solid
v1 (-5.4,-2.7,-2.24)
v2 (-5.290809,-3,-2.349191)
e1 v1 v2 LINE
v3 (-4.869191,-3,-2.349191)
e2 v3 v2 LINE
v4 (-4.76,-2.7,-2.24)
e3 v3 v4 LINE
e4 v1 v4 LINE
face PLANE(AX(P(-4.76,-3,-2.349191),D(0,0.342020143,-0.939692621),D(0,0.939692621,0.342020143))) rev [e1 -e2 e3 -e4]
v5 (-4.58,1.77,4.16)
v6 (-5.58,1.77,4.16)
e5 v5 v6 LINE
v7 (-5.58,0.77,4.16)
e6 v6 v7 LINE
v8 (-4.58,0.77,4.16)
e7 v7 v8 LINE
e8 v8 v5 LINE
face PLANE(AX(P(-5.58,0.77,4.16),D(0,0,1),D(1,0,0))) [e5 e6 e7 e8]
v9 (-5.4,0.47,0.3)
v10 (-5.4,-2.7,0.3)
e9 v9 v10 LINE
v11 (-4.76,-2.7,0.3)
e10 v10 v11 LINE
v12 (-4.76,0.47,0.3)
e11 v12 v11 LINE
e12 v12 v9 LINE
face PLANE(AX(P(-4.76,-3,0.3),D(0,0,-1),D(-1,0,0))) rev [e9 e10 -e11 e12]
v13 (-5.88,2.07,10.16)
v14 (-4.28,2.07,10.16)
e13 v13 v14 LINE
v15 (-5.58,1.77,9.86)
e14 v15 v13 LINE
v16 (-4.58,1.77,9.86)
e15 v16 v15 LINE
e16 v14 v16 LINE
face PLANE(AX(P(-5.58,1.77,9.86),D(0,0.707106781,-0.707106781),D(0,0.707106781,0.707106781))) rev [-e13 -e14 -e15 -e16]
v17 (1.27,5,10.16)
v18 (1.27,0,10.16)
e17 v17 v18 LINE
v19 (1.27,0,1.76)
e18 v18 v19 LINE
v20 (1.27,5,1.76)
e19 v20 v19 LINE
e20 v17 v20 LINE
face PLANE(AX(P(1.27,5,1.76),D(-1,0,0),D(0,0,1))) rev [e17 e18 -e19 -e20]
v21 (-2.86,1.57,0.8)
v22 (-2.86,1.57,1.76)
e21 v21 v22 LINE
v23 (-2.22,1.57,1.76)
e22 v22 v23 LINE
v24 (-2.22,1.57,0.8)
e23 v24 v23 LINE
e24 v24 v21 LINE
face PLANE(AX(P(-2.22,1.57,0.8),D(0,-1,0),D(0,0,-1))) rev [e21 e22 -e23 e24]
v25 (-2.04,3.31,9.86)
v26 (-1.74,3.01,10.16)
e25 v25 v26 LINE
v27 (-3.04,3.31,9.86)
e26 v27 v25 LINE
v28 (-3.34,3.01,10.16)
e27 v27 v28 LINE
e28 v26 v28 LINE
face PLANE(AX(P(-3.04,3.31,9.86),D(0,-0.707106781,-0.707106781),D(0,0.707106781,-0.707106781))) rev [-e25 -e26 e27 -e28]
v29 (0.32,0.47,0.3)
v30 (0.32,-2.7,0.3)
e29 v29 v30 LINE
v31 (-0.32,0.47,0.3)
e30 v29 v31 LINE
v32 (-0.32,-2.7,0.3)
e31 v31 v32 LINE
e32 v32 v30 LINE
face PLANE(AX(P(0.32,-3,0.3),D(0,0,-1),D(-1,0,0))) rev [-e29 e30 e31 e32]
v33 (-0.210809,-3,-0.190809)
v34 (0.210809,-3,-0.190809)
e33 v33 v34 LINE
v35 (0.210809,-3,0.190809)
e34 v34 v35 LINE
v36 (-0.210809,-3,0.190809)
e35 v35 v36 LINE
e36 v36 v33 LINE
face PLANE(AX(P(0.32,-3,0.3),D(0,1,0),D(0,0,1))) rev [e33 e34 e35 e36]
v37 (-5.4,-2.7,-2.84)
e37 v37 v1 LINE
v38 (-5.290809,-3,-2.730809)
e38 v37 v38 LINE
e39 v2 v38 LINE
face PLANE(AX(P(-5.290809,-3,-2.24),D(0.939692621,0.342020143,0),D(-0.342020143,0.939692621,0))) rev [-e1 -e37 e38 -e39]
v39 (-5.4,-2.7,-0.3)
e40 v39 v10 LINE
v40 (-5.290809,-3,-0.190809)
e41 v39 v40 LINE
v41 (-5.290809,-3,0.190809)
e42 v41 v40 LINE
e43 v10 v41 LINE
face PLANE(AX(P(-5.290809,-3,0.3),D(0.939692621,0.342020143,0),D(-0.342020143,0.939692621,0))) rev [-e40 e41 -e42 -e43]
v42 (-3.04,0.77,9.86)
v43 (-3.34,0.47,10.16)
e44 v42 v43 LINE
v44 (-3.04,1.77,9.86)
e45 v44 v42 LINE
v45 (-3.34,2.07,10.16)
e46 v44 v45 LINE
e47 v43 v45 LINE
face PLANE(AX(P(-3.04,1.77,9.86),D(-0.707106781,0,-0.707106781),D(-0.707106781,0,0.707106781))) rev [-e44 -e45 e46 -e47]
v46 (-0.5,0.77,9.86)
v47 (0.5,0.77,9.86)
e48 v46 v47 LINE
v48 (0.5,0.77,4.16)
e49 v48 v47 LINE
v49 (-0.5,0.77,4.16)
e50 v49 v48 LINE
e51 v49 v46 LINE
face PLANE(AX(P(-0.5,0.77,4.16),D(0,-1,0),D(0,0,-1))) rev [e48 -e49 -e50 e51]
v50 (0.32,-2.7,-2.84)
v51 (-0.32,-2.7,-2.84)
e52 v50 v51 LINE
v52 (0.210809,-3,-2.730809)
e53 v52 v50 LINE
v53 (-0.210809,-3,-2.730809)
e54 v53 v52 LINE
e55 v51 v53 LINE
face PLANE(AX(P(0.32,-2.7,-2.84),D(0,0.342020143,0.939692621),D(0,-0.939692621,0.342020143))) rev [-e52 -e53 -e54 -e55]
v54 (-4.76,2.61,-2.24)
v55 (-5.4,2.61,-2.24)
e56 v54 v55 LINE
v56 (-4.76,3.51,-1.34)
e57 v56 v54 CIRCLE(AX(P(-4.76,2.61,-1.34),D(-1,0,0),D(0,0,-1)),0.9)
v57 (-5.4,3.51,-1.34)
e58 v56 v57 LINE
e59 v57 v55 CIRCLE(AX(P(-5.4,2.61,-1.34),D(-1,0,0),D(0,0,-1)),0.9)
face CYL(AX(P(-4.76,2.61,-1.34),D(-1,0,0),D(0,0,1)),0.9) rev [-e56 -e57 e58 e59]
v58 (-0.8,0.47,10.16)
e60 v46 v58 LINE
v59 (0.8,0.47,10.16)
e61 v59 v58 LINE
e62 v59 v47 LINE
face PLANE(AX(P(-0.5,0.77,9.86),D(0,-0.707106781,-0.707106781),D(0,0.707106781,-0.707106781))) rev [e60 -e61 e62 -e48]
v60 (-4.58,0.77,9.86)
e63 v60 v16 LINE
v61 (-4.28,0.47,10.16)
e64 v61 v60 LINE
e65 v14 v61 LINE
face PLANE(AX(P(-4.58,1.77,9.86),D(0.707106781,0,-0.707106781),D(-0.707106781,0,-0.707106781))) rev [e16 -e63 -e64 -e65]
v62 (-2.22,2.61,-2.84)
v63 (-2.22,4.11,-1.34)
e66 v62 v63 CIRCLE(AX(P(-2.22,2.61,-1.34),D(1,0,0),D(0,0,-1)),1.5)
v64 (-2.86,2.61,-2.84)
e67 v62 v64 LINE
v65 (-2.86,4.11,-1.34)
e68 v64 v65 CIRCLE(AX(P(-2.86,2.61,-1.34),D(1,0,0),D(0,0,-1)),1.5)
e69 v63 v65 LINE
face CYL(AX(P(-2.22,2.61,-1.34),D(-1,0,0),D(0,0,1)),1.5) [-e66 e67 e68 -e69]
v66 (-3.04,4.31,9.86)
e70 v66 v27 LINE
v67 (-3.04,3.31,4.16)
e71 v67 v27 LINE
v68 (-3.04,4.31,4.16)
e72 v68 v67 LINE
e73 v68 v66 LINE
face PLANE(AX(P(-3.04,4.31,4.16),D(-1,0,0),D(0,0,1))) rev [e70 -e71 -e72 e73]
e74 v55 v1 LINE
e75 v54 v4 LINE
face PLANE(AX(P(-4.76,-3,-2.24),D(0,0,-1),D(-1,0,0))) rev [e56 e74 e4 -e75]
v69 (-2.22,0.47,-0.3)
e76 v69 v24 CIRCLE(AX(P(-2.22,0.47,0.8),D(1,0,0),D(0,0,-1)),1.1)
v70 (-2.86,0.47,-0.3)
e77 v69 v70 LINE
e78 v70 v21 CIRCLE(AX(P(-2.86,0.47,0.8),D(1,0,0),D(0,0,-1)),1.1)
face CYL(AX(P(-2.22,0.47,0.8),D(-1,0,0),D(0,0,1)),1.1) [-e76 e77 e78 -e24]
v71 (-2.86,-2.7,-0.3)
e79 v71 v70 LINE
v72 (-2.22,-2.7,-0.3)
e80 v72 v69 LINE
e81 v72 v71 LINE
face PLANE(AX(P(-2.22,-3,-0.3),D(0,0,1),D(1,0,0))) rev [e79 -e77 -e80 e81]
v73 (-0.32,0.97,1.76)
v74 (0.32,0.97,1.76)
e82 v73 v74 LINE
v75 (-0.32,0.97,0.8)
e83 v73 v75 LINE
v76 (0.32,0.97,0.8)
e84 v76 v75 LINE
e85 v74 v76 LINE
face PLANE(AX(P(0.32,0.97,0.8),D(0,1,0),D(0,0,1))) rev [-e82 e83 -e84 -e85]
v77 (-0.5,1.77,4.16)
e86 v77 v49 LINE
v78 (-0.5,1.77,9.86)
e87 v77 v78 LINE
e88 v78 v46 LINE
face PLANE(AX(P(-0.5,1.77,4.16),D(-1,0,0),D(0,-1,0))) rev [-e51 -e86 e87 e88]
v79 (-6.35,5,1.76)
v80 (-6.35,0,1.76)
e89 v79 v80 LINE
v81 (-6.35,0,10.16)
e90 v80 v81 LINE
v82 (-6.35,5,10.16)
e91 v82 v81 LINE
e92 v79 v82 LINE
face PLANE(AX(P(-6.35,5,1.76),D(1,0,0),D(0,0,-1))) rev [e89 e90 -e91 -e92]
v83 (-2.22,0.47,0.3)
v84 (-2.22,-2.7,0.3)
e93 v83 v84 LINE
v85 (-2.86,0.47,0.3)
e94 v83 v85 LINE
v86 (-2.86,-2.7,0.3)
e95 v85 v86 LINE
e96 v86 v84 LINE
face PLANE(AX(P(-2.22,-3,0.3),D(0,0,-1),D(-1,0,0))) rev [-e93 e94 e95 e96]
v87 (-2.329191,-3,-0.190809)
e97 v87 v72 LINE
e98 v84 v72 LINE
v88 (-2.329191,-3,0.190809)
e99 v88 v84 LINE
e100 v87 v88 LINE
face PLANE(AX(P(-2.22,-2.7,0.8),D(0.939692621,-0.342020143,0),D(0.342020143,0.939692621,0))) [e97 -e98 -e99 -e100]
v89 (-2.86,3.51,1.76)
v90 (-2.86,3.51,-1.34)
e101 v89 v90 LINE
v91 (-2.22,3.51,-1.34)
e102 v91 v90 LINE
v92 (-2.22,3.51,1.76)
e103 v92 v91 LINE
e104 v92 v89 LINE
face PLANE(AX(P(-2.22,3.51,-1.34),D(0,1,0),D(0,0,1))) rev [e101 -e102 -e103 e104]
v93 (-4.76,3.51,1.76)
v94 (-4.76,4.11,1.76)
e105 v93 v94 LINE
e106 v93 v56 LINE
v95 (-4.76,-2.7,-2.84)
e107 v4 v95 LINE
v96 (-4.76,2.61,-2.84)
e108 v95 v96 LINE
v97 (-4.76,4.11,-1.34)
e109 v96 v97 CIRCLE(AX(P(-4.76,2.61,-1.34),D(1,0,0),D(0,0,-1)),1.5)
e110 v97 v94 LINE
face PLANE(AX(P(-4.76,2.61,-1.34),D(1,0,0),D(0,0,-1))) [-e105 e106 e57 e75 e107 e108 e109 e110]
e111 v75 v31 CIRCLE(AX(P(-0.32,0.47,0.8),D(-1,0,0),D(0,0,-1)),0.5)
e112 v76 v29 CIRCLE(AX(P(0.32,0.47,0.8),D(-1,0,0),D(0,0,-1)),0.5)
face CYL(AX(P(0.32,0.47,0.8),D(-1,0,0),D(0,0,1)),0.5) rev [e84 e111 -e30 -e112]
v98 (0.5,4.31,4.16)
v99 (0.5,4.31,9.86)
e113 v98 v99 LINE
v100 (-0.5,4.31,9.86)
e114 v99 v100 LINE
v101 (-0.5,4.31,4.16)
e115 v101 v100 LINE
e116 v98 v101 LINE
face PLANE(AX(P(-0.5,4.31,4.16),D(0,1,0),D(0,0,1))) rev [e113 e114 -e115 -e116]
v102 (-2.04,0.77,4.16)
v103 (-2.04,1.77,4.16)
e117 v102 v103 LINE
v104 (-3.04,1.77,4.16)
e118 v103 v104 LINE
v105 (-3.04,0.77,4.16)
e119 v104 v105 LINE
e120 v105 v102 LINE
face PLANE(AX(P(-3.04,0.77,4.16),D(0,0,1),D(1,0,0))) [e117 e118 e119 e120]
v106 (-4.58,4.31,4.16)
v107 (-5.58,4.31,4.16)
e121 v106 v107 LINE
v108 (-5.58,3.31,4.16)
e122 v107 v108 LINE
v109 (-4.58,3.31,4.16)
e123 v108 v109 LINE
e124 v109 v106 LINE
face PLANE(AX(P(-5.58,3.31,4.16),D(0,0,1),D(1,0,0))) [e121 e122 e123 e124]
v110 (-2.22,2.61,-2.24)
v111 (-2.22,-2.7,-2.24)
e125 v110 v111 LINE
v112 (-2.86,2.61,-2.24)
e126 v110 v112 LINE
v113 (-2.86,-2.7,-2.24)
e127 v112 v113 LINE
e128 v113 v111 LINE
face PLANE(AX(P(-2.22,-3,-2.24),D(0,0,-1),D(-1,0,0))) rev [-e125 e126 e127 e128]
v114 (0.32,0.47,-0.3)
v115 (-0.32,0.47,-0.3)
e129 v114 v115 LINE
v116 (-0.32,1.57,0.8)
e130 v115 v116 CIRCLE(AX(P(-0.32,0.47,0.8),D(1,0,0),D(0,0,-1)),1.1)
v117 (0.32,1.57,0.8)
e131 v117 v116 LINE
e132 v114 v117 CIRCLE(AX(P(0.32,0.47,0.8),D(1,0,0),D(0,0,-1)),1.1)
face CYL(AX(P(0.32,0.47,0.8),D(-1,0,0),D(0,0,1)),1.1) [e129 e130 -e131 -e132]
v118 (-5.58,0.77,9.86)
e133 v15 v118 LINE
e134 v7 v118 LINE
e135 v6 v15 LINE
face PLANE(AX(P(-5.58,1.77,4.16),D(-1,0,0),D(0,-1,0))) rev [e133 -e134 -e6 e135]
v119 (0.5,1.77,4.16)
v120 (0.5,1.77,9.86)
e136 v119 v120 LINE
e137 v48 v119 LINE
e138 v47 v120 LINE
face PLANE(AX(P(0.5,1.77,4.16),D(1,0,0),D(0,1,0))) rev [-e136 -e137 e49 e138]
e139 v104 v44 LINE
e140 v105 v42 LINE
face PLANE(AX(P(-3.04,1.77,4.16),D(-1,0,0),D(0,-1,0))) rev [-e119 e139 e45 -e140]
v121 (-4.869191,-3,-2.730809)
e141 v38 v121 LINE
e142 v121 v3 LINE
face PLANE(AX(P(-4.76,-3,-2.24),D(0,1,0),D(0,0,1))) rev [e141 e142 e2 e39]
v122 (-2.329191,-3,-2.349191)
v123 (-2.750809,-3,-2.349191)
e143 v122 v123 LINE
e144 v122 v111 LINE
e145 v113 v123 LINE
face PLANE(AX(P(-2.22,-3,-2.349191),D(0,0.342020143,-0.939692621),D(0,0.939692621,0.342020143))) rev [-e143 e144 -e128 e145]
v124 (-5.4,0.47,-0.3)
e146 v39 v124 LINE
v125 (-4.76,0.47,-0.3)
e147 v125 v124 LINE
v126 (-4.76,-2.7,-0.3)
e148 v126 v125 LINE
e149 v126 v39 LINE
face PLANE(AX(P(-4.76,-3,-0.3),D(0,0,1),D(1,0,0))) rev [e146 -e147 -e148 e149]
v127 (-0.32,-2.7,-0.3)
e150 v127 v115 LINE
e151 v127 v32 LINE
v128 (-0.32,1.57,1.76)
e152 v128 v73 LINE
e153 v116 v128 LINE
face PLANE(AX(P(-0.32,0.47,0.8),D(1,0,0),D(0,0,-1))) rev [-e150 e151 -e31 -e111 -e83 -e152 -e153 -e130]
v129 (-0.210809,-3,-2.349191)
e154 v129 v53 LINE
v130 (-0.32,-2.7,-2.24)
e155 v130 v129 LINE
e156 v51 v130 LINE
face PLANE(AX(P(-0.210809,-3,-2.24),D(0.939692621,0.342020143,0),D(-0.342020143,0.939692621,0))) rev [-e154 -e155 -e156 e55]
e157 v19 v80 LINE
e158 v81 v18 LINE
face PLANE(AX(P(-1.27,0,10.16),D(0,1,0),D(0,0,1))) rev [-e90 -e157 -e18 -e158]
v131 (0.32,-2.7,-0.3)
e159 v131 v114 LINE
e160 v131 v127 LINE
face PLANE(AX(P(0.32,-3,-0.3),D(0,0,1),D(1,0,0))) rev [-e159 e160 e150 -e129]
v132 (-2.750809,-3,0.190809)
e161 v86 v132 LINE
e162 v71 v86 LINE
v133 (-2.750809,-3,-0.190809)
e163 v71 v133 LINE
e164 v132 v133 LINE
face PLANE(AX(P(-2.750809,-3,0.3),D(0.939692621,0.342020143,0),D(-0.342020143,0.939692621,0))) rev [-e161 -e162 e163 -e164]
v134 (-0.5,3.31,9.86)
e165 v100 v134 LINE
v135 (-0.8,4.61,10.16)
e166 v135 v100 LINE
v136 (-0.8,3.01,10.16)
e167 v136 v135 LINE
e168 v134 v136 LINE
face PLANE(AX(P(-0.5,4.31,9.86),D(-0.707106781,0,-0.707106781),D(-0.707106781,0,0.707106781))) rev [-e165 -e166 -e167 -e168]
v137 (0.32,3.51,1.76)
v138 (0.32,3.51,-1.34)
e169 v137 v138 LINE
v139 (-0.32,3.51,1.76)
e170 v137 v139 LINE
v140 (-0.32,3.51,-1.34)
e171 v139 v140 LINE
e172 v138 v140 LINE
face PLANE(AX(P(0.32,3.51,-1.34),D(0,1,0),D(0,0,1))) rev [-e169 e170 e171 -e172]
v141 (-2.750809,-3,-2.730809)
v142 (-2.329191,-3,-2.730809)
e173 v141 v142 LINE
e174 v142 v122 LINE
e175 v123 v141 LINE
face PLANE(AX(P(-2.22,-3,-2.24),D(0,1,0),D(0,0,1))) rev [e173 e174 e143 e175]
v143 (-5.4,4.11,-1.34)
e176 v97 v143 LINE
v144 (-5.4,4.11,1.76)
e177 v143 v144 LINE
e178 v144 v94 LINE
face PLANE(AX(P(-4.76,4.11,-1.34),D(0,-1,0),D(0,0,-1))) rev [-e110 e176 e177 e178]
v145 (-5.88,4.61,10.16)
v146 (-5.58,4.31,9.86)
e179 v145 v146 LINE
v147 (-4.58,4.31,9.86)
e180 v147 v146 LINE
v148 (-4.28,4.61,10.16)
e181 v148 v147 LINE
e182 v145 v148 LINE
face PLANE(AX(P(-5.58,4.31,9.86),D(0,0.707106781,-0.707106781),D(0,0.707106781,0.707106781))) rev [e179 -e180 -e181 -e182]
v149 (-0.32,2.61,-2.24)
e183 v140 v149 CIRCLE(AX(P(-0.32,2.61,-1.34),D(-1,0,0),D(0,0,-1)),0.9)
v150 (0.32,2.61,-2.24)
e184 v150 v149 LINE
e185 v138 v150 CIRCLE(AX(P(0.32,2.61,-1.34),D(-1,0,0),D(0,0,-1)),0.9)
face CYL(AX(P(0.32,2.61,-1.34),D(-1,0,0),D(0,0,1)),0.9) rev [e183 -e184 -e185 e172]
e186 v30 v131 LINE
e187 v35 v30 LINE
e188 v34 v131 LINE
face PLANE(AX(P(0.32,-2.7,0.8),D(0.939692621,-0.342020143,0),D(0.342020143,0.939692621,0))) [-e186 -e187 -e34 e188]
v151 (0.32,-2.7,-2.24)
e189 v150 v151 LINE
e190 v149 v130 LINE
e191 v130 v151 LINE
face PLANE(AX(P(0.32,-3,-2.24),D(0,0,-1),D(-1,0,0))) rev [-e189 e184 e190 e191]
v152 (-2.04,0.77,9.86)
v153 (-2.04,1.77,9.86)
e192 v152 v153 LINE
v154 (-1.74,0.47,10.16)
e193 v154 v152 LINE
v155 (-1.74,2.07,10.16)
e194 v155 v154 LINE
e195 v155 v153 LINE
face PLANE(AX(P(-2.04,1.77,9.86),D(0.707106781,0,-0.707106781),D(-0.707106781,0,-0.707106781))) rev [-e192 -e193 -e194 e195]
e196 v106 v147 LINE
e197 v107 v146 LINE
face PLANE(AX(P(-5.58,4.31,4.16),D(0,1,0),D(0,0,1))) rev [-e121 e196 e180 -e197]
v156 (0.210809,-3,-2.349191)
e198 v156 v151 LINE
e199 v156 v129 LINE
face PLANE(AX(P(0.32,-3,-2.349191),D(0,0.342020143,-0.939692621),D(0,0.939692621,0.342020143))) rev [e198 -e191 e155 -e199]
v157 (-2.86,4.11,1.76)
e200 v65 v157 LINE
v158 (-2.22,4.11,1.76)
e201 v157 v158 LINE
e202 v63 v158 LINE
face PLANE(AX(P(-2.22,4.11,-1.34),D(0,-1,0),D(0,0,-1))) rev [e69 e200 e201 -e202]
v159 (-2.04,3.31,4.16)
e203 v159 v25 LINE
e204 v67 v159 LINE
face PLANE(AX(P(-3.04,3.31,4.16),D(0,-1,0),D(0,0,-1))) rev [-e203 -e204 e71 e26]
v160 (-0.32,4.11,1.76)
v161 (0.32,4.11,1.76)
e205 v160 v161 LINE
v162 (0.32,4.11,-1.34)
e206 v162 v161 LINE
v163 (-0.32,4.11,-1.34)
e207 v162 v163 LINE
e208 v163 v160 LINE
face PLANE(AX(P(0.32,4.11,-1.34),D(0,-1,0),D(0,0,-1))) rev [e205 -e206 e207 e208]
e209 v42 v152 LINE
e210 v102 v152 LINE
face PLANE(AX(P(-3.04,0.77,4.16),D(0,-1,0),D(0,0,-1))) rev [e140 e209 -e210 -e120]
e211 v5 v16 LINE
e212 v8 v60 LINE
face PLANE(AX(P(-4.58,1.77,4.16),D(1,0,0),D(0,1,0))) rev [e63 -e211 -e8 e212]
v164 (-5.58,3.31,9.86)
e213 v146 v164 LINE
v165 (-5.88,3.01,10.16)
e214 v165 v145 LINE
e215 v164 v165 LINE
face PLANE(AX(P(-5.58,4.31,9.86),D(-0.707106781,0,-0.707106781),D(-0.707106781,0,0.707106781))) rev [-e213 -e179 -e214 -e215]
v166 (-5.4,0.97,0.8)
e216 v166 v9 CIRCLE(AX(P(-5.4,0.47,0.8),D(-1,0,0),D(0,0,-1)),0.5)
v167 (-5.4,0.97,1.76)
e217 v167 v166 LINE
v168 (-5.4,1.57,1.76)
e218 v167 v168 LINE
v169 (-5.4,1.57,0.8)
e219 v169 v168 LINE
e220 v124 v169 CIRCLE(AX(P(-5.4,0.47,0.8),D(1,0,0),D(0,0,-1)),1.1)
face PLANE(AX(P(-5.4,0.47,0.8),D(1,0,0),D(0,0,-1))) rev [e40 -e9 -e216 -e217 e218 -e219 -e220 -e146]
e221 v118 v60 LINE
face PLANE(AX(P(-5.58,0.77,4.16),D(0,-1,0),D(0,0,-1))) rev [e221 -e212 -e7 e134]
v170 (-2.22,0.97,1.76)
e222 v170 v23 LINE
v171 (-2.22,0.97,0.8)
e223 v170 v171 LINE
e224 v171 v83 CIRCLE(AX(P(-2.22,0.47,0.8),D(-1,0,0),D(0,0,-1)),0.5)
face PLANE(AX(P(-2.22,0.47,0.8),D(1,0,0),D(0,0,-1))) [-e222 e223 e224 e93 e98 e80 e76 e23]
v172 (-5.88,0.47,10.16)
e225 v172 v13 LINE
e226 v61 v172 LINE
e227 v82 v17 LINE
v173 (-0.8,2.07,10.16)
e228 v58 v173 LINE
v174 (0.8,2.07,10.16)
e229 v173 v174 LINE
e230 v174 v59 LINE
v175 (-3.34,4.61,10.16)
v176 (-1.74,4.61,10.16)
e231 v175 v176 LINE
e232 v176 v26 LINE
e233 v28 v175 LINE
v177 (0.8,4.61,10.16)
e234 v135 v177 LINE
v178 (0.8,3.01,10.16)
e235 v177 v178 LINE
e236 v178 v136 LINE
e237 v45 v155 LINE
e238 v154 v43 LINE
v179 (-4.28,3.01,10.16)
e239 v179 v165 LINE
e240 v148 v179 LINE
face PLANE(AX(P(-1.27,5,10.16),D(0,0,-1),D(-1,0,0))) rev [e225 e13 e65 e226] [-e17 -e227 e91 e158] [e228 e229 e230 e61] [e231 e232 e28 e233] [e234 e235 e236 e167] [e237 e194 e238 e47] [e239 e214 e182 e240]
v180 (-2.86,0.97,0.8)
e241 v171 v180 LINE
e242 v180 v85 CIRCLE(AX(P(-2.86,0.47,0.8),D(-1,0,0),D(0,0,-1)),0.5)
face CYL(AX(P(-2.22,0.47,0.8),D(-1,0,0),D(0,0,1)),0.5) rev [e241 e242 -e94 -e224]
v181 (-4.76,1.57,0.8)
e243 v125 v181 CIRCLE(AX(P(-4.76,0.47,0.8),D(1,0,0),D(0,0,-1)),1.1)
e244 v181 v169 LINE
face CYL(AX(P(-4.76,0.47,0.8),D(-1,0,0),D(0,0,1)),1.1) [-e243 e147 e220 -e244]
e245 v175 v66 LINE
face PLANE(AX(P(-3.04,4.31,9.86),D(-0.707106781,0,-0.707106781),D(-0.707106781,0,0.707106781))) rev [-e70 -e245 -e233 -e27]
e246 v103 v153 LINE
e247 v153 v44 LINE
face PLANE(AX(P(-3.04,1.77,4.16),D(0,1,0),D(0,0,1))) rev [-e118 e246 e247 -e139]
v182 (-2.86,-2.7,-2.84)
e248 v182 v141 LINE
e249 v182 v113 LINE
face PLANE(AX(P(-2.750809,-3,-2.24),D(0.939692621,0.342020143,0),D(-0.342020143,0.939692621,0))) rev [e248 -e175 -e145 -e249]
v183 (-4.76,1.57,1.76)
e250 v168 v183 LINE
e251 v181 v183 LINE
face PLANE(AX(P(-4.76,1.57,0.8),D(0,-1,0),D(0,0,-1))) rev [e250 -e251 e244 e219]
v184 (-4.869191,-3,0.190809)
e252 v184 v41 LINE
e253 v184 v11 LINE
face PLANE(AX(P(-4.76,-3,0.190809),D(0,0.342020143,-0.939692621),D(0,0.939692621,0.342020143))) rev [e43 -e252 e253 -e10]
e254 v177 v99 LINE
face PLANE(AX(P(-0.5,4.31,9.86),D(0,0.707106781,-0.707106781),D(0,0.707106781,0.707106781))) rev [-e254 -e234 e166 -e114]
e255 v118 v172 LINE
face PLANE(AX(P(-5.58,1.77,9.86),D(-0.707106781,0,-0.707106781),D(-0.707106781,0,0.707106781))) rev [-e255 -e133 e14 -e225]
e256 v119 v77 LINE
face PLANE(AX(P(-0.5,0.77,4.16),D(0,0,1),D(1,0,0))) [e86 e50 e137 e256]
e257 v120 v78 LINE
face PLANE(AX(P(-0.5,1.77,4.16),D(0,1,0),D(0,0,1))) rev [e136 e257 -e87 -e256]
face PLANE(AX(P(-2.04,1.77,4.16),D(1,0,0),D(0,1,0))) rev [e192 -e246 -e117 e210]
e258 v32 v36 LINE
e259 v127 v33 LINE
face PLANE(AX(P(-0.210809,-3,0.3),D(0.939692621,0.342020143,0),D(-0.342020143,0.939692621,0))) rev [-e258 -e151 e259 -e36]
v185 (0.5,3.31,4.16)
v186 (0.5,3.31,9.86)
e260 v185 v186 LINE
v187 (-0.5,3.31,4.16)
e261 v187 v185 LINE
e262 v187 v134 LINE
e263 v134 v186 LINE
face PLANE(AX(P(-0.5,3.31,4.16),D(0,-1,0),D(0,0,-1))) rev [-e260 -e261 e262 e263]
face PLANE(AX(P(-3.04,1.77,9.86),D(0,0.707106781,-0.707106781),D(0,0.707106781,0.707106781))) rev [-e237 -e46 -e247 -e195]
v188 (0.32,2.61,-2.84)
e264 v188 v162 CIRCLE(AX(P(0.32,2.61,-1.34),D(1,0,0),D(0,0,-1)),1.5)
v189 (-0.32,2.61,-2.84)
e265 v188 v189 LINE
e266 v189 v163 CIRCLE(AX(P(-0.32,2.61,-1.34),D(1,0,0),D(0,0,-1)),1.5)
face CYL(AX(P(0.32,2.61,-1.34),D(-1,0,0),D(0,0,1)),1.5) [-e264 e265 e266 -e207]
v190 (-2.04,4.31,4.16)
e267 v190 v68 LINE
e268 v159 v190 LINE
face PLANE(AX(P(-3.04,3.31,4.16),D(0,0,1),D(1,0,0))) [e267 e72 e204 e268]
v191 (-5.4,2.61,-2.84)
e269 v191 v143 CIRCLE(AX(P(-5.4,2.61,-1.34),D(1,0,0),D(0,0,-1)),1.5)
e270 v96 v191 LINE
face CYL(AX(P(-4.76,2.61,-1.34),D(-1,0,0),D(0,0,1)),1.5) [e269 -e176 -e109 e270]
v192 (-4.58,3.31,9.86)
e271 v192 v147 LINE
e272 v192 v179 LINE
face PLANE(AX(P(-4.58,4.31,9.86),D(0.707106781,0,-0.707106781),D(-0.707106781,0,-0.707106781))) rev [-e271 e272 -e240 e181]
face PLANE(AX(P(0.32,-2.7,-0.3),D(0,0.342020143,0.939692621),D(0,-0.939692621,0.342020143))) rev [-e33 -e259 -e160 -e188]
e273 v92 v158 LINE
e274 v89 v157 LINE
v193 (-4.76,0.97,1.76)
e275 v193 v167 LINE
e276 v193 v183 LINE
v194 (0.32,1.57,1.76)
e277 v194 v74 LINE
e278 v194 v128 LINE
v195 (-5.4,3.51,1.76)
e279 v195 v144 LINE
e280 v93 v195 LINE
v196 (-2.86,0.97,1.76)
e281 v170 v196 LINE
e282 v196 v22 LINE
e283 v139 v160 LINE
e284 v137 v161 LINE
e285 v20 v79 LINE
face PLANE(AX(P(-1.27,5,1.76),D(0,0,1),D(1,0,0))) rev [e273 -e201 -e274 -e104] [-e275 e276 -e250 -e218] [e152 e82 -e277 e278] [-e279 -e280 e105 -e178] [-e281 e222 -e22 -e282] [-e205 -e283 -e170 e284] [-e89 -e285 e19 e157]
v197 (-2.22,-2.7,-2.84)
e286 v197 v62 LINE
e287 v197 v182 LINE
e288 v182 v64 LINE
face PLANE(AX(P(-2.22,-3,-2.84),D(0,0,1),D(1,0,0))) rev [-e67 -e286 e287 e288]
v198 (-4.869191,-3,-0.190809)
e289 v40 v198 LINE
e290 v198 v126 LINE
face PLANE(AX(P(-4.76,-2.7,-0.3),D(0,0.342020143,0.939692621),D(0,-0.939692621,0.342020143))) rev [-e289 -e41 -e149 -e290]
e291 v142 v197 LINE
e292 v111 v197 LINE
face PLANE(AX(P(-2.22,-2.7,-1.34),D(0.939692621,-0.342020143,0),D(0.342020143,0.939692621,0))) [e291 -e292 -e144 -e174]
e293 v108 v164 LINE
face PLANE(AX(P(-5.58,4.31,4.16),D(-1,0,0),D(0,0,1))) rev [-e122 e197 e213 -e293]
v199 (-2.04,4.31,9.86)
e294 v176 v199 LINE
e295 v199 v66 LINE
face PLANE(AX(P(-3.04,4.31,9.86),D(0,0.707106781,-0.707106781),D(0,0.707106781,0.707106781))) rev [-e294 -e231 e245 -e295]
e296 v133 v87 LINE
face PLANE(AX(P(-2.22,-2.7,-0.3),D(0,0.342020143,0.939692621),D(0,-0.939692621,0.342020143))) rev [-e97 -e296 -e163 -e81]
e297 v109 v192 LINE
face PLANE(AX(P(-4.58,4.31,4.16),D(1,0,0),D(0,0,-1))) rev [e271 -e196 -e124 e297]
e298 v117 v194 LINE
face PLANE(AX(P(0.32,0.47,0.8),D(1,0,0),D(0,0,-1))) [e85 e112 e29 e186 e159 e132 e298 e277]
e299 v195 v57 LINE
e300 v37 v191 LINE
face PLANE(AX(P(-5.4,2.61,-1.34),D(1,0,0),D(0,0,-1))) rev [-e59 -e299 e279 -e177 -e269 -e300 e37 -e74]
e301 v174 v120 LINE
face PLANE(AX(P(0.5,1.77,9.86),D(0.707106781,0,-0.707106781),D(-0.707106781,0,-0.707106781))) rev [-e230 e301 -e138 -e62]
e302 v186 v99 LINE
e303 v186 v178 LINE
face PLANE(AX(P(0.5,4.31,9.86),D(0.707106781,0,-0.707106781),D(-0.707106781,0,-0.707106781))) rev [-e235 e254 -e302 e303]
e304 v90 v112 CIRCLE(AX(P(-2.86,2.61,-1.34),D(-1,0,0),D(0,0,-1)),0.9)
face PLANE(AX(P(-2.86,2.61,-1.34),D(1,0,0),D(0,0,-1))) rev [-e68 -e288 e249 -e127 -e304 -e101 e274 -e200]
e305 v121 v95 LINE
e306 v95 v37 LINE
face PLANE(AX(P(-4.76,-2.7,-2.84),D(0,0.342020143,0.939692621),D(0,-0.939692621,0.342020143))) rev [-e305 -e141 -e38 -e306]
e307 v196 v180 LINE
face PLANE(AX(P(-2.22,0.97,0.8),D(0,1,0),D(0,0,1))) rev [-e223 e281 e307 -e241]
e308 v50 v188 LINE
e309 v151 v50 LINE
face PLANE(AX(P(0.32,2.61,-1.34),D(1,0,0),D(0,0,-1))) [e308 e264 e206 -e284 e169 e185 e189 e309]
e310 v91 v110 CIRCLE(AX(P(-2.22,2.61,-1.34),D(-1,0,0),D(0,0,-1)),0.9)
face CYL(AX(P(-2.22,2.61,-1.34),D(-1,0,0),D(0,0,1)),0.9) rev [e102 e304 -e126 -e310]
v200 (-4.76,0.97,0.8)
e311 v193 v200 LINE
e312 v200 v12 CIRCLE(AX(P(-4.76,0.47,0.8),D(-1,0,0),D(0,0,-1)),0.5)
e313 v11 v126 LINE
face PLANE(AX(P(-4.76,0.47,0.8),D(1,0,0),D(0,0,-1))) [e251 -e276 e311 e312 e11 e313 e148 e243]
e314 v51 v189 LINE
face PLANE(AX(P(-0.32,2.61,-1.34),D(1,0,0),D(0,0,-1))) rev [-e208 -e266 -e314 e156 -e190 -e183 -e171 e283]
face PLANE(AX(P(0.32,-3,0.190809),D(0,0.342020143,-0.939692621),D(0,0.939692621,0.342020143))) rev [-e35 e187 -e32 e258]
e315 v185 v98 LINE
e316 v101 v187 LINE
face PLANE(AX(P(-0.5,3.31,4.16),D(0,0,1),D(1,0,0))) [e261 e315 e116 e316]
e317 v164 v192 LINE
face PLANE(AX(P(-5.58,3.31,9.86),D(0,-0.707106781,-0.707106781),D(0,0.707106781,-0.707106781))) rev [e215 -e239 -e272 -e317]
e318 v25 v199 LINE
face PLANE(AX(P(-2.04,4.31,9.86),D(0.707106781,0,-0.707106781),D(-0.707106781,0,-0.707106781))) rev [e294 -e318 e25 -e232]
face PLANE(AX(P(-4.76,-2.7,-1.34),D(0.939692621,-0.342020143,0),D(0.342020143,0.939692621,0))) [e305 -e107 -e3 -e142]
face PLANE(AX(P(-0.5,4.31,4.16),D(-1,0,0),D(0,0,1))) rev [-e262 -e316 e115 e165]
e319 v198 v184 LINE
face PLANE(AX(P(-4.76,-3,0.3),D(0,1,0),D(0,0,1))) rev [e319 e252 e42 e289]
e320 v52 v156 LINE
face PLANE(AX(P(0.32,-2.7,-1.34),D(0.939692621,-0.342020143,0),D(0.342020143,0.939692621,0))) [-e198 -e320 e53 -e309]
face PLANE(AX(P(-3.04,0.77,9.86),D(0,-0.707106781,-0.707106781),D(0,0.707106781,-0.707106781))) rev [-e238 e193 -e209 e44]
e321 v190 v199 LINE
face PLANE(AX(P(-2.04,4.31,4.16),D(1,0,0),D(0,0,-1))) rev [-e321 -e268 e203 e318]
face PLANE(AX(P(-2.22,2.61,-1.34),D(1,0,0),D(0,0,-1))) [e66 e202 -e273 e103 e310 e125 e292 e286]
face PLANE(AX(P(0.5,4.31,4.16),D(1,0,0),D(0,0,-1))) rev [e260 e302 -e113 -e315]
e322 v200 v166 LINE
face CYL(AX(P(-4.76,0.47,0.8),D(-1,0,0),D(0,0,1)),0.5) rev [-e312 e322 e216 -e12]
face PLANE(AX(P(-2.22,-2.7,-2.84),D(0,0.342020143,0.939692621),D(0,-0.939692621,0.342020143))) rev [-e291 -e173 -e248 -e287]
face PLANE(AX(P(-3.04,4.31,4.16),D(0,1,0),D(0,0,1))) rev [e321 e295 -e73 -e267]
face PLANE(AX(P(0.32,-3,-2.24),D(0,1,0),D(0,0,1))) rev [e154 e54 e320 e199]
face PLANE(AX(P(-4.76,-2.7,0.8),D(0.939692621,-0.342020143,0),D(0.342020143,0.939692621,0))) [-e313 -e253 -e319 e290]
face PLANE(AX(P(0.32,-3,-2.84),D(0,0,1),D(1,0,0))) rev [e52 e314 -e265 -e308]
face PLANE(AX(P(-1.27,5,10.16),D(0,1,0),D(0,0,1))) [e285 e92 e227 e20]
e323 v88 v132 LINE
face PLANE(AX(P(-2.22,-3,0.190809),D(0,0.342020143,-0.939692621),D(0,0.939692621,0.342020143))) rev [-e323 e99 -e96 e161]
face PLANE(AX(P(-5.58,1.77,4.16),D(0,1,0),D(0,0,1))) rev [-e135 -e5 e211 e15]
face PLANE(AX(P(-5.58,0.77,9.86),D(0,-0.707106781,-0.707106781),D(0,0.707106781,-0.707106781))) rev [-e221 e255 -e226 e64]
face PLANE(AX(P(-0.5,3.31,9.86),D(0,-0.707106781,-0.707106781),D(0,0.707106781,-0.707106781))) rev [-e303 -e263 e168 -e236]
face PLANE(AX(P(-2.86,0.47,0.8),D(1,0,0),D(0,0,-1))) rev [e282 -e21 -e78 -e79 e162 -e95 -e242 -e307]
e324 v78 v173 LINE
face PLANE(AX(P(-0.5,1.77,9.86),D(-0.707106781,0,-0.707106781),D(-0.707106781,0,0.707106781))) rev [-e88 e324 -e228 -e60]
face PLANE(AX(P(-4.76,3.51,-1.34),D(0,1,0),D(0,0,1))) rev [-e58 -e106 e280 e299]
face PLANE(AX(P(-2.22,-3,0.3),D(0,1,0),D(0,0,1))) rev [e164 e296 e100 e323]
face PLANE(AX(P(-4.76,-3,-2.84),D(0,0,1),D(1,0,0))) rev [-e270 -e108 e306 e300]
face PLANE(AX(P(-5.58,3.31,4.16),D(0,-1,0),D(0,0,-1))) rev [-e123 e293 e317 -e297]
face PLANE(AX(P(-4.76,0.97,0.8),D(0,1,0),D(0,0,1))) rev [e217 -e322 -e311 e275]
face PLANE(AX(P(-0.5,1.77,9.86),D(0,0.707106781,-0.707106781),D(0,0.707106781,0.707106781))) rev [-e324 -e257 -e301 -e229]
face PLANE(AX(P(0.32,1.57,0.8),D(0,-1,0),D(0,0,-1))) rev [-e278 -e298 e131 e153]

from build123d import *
from OCP.BRepFilletAPI import BRepFilletAPI_MakeChamfer
from build123d.topology import SkipClean

# Parameters (mm, degrees)
EXTRUDE_2563_DEPTH                    = 0.32
EXTRUDE_2563_2_DEPTH                  = 0.32
SKETCH_2_W                            = 2.54
SKETCH_2_H                            = 8.4
EXTRUDE_2921_DEPTH                    = 5
SKETCH_3_W                            = 1
SKETCH_3_H                            = 1
CUT_EXTRUDE_3170_DEPTH                = 6
CHAMFER_1_SIZE                        = 0.3
CHAMFER_2_SIZE                        = 0.3
CHAMFER_2_SIZE2                       = 0.10919107
PATTERN_LINEAR_3747_COUNT             = 3
PATTERN_LINEAR_3747_PITCH             = 2.54
CHAMFER_1_OF_PATTERN_LINEAR_3747_SIZE = 0.3
PATTERN_START                         = -5.29080893
PATTERN_LINEAR_12180_DEPTH            = 0.42161786
PATTERN_START_2                       = -2.75080893
PATTERN_LINEAR_12180_2_DEPTH          = 0.42161786
PATTERN_START_3                       = -0.19080893
PATTERN_LINEAR_12180_3_OUTLINE_W      = 0.10919107
PATTERN_LINEAR_12180_3_OUTLINE_H      = 0.6
PATTERN_LINEAR_12180_3_DEPTH          = 0.99080893
PATTERN_START_4                       = -2.84
PATTERN_LINEAR_12180_4_DEPTH          = 0.6
PATTERN_START_5                       = -2.73080893
PATTERN_LINEAR_12180_5_OUTLINE_W      = 0.10919107
PATTERN_LINEAR_12180_5_OUTLINE_H      = 2.54
PATTERN_LINEAR_12180_5_DEPTH          = 1.39080893
PATTERN_START_6                       = -1.484615596
PATTERN_LINEAR_12180_6_OUTLINE_W      = 0.10919107
PATTERN_LINEAR_12180_6_OUTLINE_H      = 0.6
PATTERN_LINEAR_12180_6_DEPTH          = 4.484615596
PATTERN_START_7                       = 0.719658002
PATTERN_LINEAR_12180_7_OUTLINE_W      = 0.10919107
PATTERN_LINEAR_12180_7_OUTLINE_H      = 0.6
PATTERN_LINEAR_12180_7_DEPTH          = 2.280341998
PATTERN_START_8                       = -0.3
PATTERN_LINEAR_12180_8_DEPTH          = 0.49080893
PATTERN_START_9                       = -5.4
PATTERN_LINEAR_12180_9_DEPTH          = 3.18


with BuildPart() as part:
    # Эскиз1 → Extrude 2563 (new, symmetric)
    with BuildSketch(Plane(origin=(0, 0, 0), x_dir=(0, 0, -1), z_dir=(1, 0, 0))):
        with BuildLine():
            Line((0.3, -3), (0.3, 0.47))
            ThreePointArc((0.3, 0.47), (-0.022182541, 1.247817459), (-0.8, 1.57))
            Line((-0.8, 1.57), (-4.16, 1.57))
            Line((-4.16, 1.57), (-4.16, 0.97))
            Line((-4.16, 0.97), (-0.8, 0.97))
            ThreePointArc((-0.8, 0.97), (-0.446446609, 0.823553391), (-0.3, 0.47))
            Line((-0.3, 0.47), (-0.3, -3))
            Line((-0.3, -3), (0.3, -3))
        make_face()
    extrude(amount=EXTRUDE_2563_DEPTH, both=True)



with BuildPart() as body_2:
    # Эскиз1 → Extrude 2563 2 (new, symmetric)
    with BuildSketch(Plane(origin=(0, 0, 0), x_dir=(0, 0, -1), z_dir=(1, 0, 0))):
        with BuildLine():
            Line((2.84, -3), (2.84, 2.61))
            ThreePointArc((2.84, 2.61), (2.400660172, 3.670660172), (1.34, 4.11))
            Line((1.34, 4.11), (-4.16, 4.11))
            Line((-4.16, 4.11), (-4.16, 3.51))
            Line((-4.16, 3.51), (1.34, 3.51))
            ThreePointArc((1.34, 3.51), (1.976396103, 3.246396103), (2.24, 2.61))
            Line((2.24, 2.61), (2.24, -3))
            Line((2.24, -3), (2.84, -3))
        make_face()
    extrude(amount=EXTRUDE_2563_2_DEPTH, both=True)


with BuildPart() as part_1:
    add(part.part)

    add(body_2.part)  # Extrude 2921 merges body 2
    # Эскиз2 → Extrude 2921 (add)
    with BuildSketch(Plane(origin=(0, 0, 0), x_dir=(1, 0, 0), z_dir=(0, 1, 0))):
        with Locations((0, -5.96)):
            Rectangle(SKETCH_2_W, SKETCH_2_H)
    extrude_2921 = extrude(amount=EXTRUDE_2921_DEPTH)

    # Эскиз3 → Cut-Extrude 3170 (cut)
    with BuildSketch(Plane.XY.offset(10.16)):
        with Locations((0, 1.27)):
            Rectangle(SKETCH_3_W, SKETCH_3_H)
        with Locations((0, 3.81)):
            Rectangle(SKETCH_3_W, SKETCH_3_H)
    cut_extrude_3170 = extrude(amount=-CUT_EXTRUDE_3170_DEPTH, mode=Mode.SUBTRACT)

    # Фаска1
    chamfer_1_edges = [part_1.edges().sort_by_distance(p)[0] for p in [
        (-0.5, 1.27, 10.16),
        (0, 0.77, 10.16),
        (0.5, 1.27, 10.16),
        (0, 1.77, 10.16),
        (-0.5, 3.81, 10.16),
        (0, 3.31, 10.16),
        (0.5, 3.81, 10.16),
        (0, 4.31, 10.16),
    ]]
    chamfer(chamfer_1_edges, length=CHAMFER_1_SIZE)

    # Фаска2: one chamfer whose edges measure the first distance from different faces: ONE call of the kernel's chamfer builder (chamfer() names one face for all edges)
    chamfer_2_edges_1 = [part_1.edges().sort_by_distance(p)[0] for p in [
        (-0.32, -3, 0),
    ]]
    chamfer_2_side_1 = [part_1.faces().sort_by_distance(p)[0] for p in [
        (-0.32, -0.335827759, 0.275050022),
    ]]
    chamfer_2_edges_2 = [part_1.edges().sort_by_distance(p)[0] for p in [
        (0, -3, 0.3),
    ]]
    chamfer_2_side_2 = [part_1.faces().sort_by_distance(p)[0] for p in [
        (0, -1.265, 0.3),
    ]]
    chamfer_2_edges_3 = [part_1.edges().sort_by_distance(p)[0] for p in [
        (0, -3, -0.3),
    ]]
    chamfer_2_side_3 = [part_1.faces().sort_by_distance(p)[0] for p in [
        (0, -1.265, -0.3),
    ]]
    chamfer_2_edges_4 = [part_1.edges().sort_by_distance(p)[0] for p in [
        (0.32, -3, 0),
    ]]
    chamfer_2_side_4 = [part_1.faces().sort_by_distance(p)[0] for p in [
        (0.32, -0.335827759, 0.275050022),
    ]]
    chamfer_2_edges_5 = [part_1.edges().sort_by_distance(p)[0] for p in [
        (0.32, -3, -2.54),
    ]]
    chamfer_2_side_5 = [part_1.faces().sort_by_distance(p)[0] for p in [
        (0.32, -2.915317003, -2.54),
    ]]
    chamfer_2_edges_6 = [part_1.edges().sort_by_distance(p)[0] for p in [
        (-0.32, -3, -2.54),
    ]]
    chamfer_2_side_6 = [part_1.faces().sort_by_distance(p)[0] for p in [
        (-0.32, -2.915317003, -2.54),
    ]]
    chamfer_2_edges_7 = [part_1.edges().sort_by_distance(p)[0] for p in [
        (0, -3, -2.24),
    ]]
    chamfer_2_side_7 = [part_1.faces().sort_by_distance(p)[0] for p in [
        (0, -0.195, -2.24),
    ]]
    chamfer_2_edges_8 = [part_1.edges().sort_by_distance(p)[0] for p in [
        (0, -3, -2.84),
    ]]
    chamfer_2_side_8 = [part_1.faces().sort_by_distance(p)[0] for p in [
        (0, -0.195, -2.84),
    ]]
    chamfer_2 = BRepFilletAPI_MakeChamfer(part_1.part.solid().wrapped)
    for e in chamfer_2_edges_1:
        chamfer_2.Add(CHAMFER_2_SIZE, CHAMFER_2_SIZE2, e.wrapped, chamfer_2_side_1[0].wrapped)  # the first distance lies on this face
    for e in chamfer_2_edges_2:
        chamfer_2.Add(CHAMFER_2_SIZE, CHAMFER_2_SIZE2, e.wrapped, chamfer_2_side_2[0].wrapped)  # the first distance lies on this face
    for e in chamfer_2_edges_3:
        chamfer_2.Add(CHAMFER_2_SIZE, CHAMFER_2_SIZE2, e.wrapped, chamfer_2_side_3[0].wrapped)  # the first distance lies on this face
    for e in chamfer_2_edges_4:
        chamfer_2.Add(CHAMFER_2_SIZE, CHAMFER_2_SIZE2, e.wrapped, chamfer_2_side_4[0].wrapped)  # the first distance lies on this face
    for e in chamfer_2_edges_5:
        chamfer_2.Add(CHAMFER_2_SIZE, CHAMFER_2_SIZE2, e.wrapped, chamfer_2_side_5[0].wrapped)  # the first distance lies on this face
    for e in chamfer_2_edges_6:
        chamfer_2.Add(CHAMFER_2_SIZE, CHAMFER_2_SIZE2, e.wrapped, chamfer_2_side_6[0].wrapped)  # the first distance lies on this face
    for e in chamfer_2_edges_7:
        chamfer_2.Add(CHAMFER_2_SIZE, CHAMFER_2_SIZE2, e.wrapped, chamfer_2_side_7[0].wrapped)  # the first distance lies on this face
    for e in chamfer_2_edges_8:
        chamfer_2.Add(CHAMFER_2_SIZE, CHAMFER_2_SIZE2, e.wrapped, chamfer_2_side_8[0].wrapped)  # the first distance lies on this face
    add(Compound.cast(chamfer_2.Shape()), mode=Mode.REPLACE)

    # Pattern Linear 3747: Extrude 2921, Cut-Extrude 3170 ×3
    with Locations(*[(-i * PATTERN_LINEAR_3747_PITCH, 0, 0) for i in range(1, PATTERN_LINEAR_3747_COUNT)]):
        add(extrude_2921)
        add(cut_extrude_3170, mode=Mode.SUBTRACT)

    # Фаска1 of Pattern Linear 3747
    chamfer_1_of_pattern_linear_3747_edges = [part_1.edges().sort_by_distance(p)[0] for p in [
        (-3.04, 1.27, 10.16),
        (-2.54, 0.77, 10.16),
        (-2.04, 1.27, 10.16),
        (-2.54, 1.77, 10.16),
        (-3.04, 3.81, 10.16),
        (-2.54, 3.31, 10.16),
        (-2.04, 3.81, 10.16),
        (-2.54, 4.31, 10.16),
        (-5.58, 1.27, 10.16),
        (-5.08, 0.77, 10.16),
        (-4.58, 1.27, 10.16),
        (-5.08, 1.77, 10.16),
        (-5.58, 3.81, 10.16),
        (-5.08, 3.31, 10.16),
        (-4.58, 3.81, 10.16),
        (-5.08, 4.31, 10.16),
    ]]
    chamfer(chamfer_1_of_pattern_linear_3747_edges, length=CHAMFER_1_OF_PATTERN_LINEAR_3747_SIZE)

    # Pattern Linear 12180: read off the stored shape, not the designer's step
    # Pattern Linear 12180 outline → Pattern Linear 12180 (add)
    with BuildSketch(Plane.YZ.offset(PATTERN_START)):
        with BuildLine():
            Line((4.11, 1.76), (3.51, 1.76))
            Line((3.51, 1.76), (3.51, -1.34))
            ThreePointArc((3.51, -1.34), (3.246396103, -1.976396103), (2.61, -2.24))
            Line((2.61, -2.24), (-2.7, -2.24))
            Line((-2.7, -2.24), (-3, -2.34919107))
            Line((-3, -2.34919107), (-3, -2.73080893))
            Line((-3, -2.73080893), (-2.7, -2.84))
            Line((-2.7, -2.84), (2.61, -2.84))
            ThreePointArc((2.61, -2.84), (3.670660172, -2.400660172), (4.11, -1.34))
            Line((4.11, -1.34), (4.11, 1.76))
        make_face()
        with BuildLine():
            Line((1.57, 0.8), (1.57, 1.76))
            Line((1.57, 1.76), (0.97, 1.76))
            Line((0.97, 1.76), (0.97, 0.8))
            ThreePointArc((0.97, 0.8), (0.823553391, 0.446446609), (0.47, 0.3))
            Line((0.47, 0.3), (-2.7, 0.3))
            Line((-2.7, 0.3), (-3, 0.19080893))
            Line((-3, 0.19080893), (-3, -0.19080893))
            Line((-3, -0.19080893), (-2.7, -0.3))
            Line((-2.7, -0.3), (0.47, -0.3))
            ThreePointArc((0.47, -0.3), (1.247817459, 0.022182541), (1.57, 0.8))
        make_face()
    extrude(amount=PATTERN_LINEAR_12180_DEPTH)

    # Pattern Linear 12180 2 outline → Pattern Linear 12180 2 (add)
    with BuildSketch(Plane.YZ.offset(PATTERN_START_2)):
        with BuildLine():
            Line((4.11, 1.76), (3.51, 1.76))
            Line((3.51, 1.76), (3.51, -1.34))
            ThreePointArc((3.51, -1.34), (3.246396103, -1.976396103), (2.61, -2.24))
            Line((2.61, -2.24), (-2.7, -2.24))
            Line((-2.7, -2.24), (-3, -2.34919107))
            Line((-3, -2.34919107), (-3, -2.73080893))
            Line((-3, -2.73080893), (-2.7, -2.84))
            Line((-2.7, -2.84), (2.61, -2.84))
            ThreePointArc((2.61, -2.84), (3.670660172, -2.400660172), (4.11, -1.34))
            Line((4.11, -1.34), (4.11, 1.76))
        make_face()
        with BuildLine():
            Line((1.57, 0.8), (1.57, 1.76))
            Line((1.57, 1.76), (0.97, 1.76))
            Line((0.97, 1.76), (0.97, 0.8))
            ThreePointArc((0.97, 0.8), (0.823553391, 0.446446609), (0.47, 0.3))
            Line((0.47, 0.3), (-2.7, 0.3))
            Line((-2.7, 0.3), (-3, 0.19080893))
            Line((-3, 0.19080893), (-3, -0.19080893))
            Line((-3, -0.19080893), (-2.7, -0.3))
            Line((-2.7, -0.3), (0.47, -0.3))
            ThreePointArc((0.47, -0.3), (1.247817459, 0.022182541), (1.57, 0.8))
        make_face()
    extrude(amount=PATTERN_LINEAR_12180_2_DEPTH)

    # Pattern Linear 12180 3 outline → Pattern Linear 12180 3 (add)
    with BuildSketch(Plane.XY.offset(PATTERN_START_3)):
        Polygon((-2.75080893, 1.57), (-2.86, 1.57), (-2.86, -2.7), (-2.75080893, -3), align=None)
        with Locations((-2.805404465, 3.81)):
            Rectangle(PATTERN_LINEAR_12180_3_OUTLINE_W, PATTERN_LINEAR_12180_3_OUTLINE_H)
        Polygon((-2.22, 1.57), (-2.32919107, 1.57), (-2.32919107, -3), (-2.22, -2.7), align=None)
        with Locations((-2.274595535, 3.81)):
            Rectangle(PATTERN_LINEAR_12180_3_OUTLINE_W, PATTERN_LINEAR_12180_3_OUTLINE_H)
        Polygon((-5.29080893, 1.57), (-5.4, 1.57), (-5.4, -2.7), (-5.29080893, -3), align=None)
        with Locations((-5.345404465, 3.81)):
            Rectangle(PATTERN_LINEAR_12180_3_OUTLINE_W, PATTERN_LINEAR_12180_3_OUTLINE_H)
        Polygon((-4.76, 1.57), (-4.86919107, 1.57), (-4.86919107, -3), (-4.76, -2.7), align=None)
        with Locations((-4.814595535, 3.81)):
            Rectangle(PATTERN_LINEAR_12180_3_OUTLINE_W, PATTERN_LINEAR_12180_3_OUTLINE_H)
    extrude(amount=PATTERN_LINEAR_12180_3_DEPTH)

    # Pattern Linear 12180 4 outline → Pattern Linear 12180 4 (add)
    with BuildSketch(Plane.XY.offset(PATTERN_START_4)):
        Polygon((-2.86, 3.51), (-2.86, -2.7), (-2.75080893, -3), (-2.75080893, 3.51), align=None)
        Polygon((-2.32919107, 3.51), (-2.32919107, -3), (-2.22, -2.7), (-2.22, 3.51), align=None)
        Polygon((-5.4, 3.51), (-5.4, -2.7), (-5.29080893, -3), (-5.29080893, 3.51), align=None)
        Polygon((-4.86919107, 3.51), (-4.86919107, -3), (-4.76, -2.7), (-4.76, 3.51), align=None)
    extrude(amount=PATTERN_LINEAR_12180_4_DEPTH)

    # Pattern Linear 12180 5 outline → Pattern Linear 12180 5 (add)
    with BuildSketch(Plane.XY.offset(PATTERN_START_5)):
        with Locations((-2.805404465, 2.84)):
            Rectangle(PATTERN_LINEAR_12180_5_OUTLINE_W, PATTERN_LINEAR_12180_5_OUTLINE_H)
        with Locations((-2.274595535, 2.84)):
            Rectangle(PATTERN_LINEAR_12180_5_OUTLINE_W, PATTERN_LINEAR_12180_5_OUTLINE_H)
        with Locations((-5.345404465, 2.84)):
            Rectangle(PATTERN_LINEAR_12180_5_OUTLINE_W, PATTERN_LINEAR_12180_5_OUTLINE_H)
        with Locations((-4.814595535, 2.84)):
            Rectangle(PATTERN_LINEAR_12180_5_OUTLINE_W, PATTERN_LINEAR_12180_5_OUTLINE_H)
    extrude(amount=PATTERN_LINEAR_12180_5_DEPTH)

    # Pattern Linear 12180 6 outline → Pattern Linear 12180 6 (add)
    with BuildSketch(Plane.XY.offset(PATTERN_START_6)):
        with Locations((-2.805404465, 3.81)):
            Rectangle(PATTERN_LINEAR_12180_6_OUTLINE_W, PATTERN_LINEAR_12180_6_OUTLINE_H)
        with Locations((-2.274595535, 3.81)):
            Rectangle(PATTERN_LINEAR_12180_6_OUTLINE_W, PATTERN_LINEAR_12180_6_OUTLINE_H)
        with Locations((-5.345404465, 3.81)):
            Rectangle(PATTERN_LINEAR_12180_6_OUTLINE_W, PATTERN_LINEAR_12180_6_OUTLINE_H)
        with Locations((-4.814595535, 3.81)):
            Rectangle(PATTERN_LINEAR_12180_6_OUTLINE_W, PATTERN_LINEAR_12180_6_OUTLINE_H)
    extrude(amount=PATTERN_LINEAR_12180_6_DEPTH)

    # Pattern Linear 12180 7 outline → Pattern Linear 12180 7 (add)
    with BuildSketch(Plane.XY.offset(PATTERN_START_7)):
        with Locations((-2.805404465, 1.27)):
            Rectangle(PATTERN_LINEAR_12180_7_OUTLINE_W, PATTERN_LINEAR_12180_7_OUTLINE_H)
        with Locations((-2.274595535, 1.27)):
            Rectangle(PATTERN_LINEAR_12180_7_OUTLINE_W, PATTERN_LINEAR_12180_7_OUTLINE_H)
        with Locations((-5.345404465, 1.27)):
            Rectangle(PATTERN_LINEAR_12180_7_OUTLINE_W, PATTERN_LINEAR_12180_7_OUTLINE_H)
        with Locations((-4.814595535, 1.27)):
            Rectangle(PATTERN_LINEAR_12180_7_OUTLINE_W, PATTERN_LINEAR_12180_7_OUTLINE_H)
    extrude(amount=PATTERN_LINEAR_12180_7_DEPTH)

    # Pattern Linear 12180 8 outline → Pattern Linear 12180 8 (add)
    with BuildSketch(Plane.XY.offset(PATTERN_START_8)):
        Polygon((-2.75080893, 0.97), (-2.86, 0.97), (-2.86, -2.7), (-2.75080893, -3), align=None)
        Polygon((-2.22, 0.97), (-2.32919107, 0.97), (-2.32919107, -3), (-2.22, -2.7), align=None)
        Polygon((-5.29080893, 0.97), (-5.4, 0.97), (-5.4, -2.7), (-5.29080893, -3), align=None)
        Polygon((-4.76, 0.97), (-4.86919107, 0.97), (-4.86919107, -3), (-4.76, -2.7), align=None)
    extrude(amount=PATTERN_LINEAR_12180_8_DEPTH)

    # Pattern Linear 12180 9 outline → Pattern Linear 12180 9 (cut)
    with SkipClean():  # the faces are left unmerged after this step: merging them gives an invalid solid
        with BuildSketch(Plane.YZ.offset(PATTERN_START_9)):
            with BuildLine():
                ThreePointArc((4.11, -1.34), (3.670660172, -2.400660172), (2.61, -2.84))
                Line((2.61, -2.84), (3.51, -2.84))
                Line((3.51, -2.84), (3.51, -2.73080893))
                Line((3.51, -2.73080893), (4.11, -2.73080893))
                Line((4.11, -2.73080893), (4.11, -1.34))
            make_face()
            Polygon((-3, -2.84), (-2.7, -2.84), (-3, -2.73080893), align=None)
            Polygon((-3, -2.34919107), (-2.7, -2.24), (-3, -2.24), align=None)
            with BuildLine():
                Line((1.57, -1.34), (1.57, -2.24))
                Line((1.57, -2.24), (2.61, -2.24))
                ThreePointArc((2.61, -2.24), (3.246396103, -1.976396103), (3.51, -1.34))
                Line((3.51, -1.34), (1.57, -1.34))
            make_face()
            Polygon((-3, -0.19080893), (-3, -0.3), (-2.7, -0.3), align=None)
            with BuildLine():
                ThreePointArc((1.57, 0.8), (1.247817459, 0.022182541), (0.47, -0.3))
                Line((0.47, -0.3), (0.97, -0.3))
                Line((0.97, -0.3), (0.97, -0.19080893))
                Line((0.97, -0.19080893), (1.57, -0.19080893))
                Line((1.57, -0.19080893), (1.57, 0.8))
            make_face()
            with BuildLine():
                Line((0.97, 0.8), (-3, 0.8))
                Line((-3, 0.8), (-3, 0.19080893))
                Line((-3, 0.19080893), (-2.7, 0.3))
                Line((-2.7, 0.3), (0.47, 0.3))
                ThreePointArc((0.47, 0.3), (0.823553391, 0.446446609), (0.97, 0.8))
            make_face()
        extrude(amount=PATTERN_LINEAR_12180_9_DEPTH, mode=Mode.SUBTRACT)


solid = part_1.part
